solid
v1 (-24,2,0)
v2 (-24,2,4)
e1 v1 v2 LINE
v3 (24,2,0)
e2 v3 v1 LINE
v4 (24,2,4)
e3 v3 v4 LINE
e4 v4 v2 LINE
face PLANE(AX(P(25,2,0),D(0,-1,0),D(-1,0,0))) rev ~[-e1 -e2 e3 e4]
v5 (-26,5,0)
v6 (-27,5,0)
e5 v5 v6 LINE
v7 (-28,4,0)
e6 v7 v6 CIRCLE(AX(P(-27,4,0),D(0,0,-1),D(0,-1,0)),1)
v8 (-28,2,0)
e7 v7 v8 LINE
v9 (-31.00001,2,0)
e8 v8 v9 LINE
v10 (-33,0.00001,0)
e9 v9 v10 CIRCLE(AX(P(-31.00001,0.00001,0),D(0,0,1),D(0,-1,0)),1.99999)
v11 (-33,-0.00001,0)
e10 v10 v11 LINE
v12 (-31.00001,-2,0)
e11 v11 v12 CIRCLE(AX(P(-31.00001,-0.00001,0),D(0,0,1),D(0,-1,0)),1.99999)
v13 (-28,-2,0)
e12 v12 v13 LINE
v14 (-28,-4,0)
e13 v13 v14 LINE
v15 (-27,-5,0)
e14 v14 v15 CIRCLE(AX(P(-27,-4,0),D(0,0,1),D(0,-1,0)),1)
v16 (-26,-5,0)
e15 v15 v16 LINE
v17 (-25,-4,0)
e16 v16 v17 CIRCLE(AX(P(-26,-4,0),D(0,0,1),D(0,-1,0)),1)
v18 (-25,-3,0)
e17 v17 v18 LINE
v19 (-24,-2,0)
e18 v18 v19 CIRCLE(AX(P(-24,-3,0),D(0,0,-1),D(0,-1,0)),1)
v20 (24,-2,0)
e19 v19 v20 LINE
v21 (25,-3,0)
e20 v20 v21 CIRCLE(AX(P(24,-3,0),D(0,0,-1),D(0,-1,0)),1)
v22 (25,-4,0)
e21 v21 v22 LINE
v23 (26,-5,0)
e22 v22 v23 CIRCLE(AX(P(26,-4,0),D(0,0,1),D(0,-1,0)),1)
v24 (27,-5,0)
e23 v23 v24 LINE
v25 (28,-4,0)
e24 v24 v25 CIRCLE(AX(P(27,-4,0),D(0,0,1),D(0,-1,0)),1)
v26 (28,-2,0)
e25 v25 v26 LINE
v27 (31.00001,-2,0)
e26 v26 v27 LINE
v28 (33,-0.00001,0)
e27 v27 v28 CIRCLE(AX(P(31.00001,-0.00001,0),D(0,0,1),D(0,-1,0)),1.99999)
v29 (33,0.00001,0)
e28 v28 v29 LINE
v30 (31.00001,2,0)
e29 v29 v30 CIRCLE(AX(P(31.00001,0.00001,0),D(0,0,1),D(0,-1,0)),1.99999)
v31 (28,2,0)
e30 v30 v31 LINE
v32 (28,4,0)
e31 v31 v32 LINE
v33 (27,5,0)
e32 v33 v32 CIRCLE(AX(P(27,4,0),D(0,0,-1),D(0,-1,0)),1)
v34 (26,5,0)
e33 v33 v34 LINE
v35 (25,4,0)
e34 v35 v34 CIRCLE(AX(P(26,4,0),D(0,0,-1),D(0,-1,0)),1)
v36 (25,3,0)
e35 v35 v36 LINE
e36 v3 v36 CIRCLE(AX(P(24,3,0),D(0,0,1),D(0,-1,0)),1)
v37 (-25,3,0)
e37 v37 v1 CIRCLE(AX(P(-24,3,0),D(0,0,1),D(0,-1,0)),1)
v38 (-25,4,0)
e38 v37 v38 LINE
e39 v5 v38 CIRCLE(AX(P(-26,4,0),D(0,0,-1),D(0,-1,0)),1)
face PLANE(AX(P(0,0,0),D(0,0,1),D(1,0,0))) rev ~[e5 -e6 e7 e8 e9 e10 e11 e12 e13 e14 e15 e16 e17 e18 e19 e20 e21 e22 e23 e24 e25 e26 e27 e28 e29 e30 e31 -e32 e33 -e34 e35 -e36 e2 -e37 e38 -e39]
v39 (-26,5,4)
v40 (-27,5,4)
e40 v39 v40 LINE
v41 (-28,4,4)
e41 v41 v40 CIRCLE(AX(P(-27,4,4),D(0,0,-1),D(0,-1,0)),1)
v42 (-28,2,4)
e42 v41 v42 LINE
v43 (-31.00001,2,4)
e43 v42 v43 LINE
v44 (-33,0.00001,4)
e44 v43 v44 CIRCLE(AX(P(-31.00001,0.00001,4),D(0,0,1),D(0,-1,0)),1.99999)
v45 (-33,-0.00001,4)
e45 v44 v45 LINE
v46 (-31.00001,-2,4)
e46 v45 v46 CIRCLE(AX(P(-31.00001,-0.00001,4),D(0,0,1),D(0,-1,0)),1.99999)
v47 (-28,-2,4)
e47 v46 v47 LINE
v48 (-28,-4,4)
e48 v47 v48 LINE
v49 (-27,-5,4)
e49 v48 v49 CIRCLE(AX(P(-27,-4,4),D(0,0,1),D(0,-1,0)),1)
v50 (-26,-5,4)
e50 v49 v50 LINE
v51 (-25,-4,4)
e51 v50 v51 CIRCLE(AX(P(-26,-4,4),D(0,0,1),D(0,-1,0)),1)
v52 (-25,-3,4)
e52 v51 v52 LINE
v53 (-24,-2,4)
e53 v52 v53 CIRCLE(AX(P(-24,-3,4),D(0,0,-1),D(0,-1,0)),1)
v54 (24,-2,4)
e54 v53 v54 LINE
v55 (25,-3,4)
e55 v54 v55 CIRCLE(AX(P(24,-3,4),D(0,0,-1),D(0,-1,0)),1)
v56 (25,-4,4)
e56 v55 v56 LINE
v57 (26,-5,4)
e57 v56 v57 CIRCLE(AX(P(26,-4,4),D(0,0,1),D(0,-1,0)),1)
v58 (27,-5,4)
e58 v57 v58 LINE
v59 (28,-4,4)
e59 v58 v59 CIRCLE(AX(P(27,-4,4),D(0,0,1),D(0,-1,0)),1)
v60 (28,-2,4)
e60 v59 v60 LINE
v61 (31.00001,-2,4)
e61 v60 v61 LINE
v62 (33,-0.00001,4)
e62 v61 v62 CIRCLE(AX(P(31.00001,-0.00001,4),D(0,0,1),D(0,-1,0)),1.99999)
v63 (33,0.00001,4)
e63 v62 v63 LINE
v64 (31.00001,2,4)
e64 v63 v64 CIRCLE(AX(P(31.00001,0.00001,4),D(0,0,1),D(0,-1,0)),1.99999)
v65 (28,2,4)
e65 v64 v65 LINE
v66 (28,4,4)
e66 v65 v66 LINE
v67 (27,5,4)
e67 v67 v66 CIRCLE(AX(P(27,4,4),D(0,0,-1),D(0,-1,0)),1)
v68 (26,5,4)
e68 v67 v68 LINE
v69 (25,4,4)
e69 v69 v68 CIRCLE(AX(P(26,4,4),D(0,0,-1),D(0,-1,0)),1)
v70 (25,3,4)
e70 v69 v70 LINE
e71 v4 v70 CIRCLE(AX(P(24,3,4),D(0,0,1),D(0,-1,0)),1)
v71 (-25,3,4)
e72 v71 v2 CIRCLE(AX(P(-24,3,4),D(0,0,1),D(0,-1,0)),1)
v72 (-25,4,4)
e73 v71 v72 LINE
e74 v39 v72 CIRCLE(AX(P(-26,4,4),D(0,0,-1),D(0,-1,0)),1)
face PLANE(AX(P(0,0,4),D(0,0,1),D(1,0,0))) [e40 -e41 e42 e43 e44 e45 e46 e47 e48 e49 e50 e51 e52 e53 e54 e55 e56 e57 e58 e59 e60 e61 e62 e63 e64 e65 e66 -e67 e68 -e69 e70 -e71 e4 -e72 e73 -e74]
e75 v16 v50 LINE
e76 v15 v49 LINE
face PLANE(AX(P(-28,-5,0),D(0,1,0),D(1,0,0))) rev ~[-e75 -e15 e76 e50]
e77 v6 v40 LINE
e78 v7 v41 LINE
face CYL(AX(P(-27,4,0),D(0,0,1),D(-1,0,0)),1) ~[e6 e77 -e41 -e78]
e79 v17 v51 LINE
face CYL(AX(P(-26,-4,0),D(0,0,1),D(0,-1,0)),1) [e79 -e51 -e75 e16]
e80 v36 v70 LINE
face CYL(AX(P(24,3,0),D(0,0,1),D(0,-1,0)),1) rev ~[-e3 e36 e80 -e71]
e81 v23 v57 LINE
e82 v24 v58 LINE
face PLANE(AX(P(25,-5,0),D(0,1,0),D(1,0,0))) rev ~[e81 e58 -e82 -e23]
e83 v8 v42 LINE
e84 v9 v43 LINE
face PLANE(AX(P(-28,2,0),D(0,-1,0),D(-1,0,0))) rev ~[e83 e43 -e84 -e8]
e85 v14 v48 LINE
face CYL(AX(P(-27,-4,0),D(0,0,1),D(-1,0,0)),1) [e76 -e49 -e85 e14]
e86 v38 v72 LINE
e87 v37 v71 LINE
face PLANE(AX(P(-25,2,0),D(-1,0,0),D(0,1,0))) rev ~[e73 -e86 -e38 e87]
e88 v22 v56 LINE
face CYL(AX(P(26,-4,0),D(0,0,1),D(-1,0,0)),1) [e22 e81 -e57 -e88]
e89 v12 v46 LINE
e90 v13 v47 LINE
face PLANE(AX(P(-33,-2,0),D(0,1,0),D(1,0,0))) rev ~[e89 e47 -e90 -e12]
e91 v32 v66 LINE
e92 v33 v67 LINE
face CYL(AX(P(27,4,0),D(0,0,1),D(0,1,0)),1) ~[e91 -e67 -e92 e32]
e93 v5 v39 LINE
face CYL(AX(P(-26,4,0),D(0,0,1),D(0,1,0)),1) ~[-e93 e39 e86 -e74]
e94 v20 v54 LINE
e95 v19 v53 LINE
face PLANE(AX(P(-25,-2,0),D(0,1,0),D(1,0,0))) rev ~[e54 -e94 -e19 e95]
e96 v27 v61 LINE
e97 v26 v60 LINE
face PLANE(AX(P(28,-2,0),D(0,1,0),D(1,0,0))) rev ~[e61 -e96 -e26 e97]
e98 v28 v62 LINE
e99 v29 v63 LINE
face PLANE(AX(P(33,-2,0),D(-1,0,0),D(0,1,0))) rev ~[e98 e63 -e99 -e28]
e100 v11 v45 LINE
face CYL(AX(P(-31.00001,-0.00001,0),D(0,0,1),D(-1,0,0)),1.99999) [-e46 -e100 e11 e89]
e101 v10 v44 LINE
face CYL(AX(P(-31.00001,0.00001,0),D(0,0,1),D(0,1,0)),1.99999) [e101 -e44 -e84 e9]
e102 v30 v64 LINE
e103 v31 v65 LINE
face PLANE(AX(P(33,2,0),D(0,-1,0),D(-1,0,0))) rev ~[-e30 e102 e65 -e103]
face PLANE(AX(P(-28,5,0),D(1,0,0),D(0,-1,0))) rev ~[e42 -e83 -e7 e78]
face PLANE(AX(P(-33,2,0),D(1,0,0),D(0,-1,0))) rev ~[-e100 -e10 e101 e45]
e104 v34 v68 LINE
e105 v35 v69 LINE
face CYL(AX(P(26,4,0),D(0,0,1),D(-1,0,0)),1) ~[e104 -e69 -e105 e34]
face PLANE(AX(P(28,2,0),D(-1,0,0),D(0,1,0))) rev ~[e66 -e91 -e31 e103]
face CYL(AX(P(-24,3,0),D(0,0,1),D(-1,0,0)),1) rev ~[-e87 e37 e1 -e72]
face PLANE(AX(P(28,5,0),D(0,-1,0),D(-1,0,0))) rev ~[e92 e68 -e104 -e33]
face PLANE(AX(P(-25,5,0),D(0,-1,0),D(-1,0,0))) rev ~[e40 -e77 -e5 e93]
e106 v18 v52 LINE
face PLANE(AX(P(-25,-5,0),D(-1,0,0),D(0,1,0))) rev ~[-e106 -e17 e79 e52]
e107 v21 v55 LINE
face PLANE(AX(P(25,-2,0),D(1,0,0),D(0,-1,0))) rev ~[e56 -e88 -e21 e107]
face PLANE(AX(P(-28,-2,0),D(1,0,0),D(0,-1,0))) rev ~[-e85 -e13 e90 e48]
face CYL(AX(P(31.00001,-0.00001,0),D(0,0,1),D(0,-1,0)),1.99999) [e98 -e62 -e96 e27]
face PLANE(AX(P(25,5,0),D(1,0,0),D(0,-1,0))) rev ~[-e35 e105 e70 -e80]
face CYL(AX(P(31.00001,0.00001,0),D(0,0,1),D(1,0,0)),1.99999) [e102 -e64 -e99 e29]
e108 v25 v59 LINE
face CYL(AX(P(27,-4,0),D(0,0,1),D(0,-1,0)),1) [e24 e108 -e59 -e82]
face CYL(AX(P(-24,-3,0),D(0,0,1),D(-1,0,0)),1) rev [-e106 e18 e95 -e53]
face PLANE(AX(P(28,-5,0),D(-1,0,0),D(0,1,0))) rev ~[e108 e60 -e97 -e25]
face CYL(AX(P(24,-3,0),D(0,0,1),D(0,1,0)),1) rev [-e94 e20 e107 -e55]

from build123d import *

# Parameters (mm, degrees)
F1_DEPTH = 4
F2_R     = 1.99999
F3_R     = 1


# Not quite as in the source:
# - a fillet or chamfer is up to 0.001 mm smaller than in the source, because OpenCascade refuses the exact size


with BuildPart() as f1:
    # F0 (on Top) → F1 (new body)
    with BuildSketch(Plane.XY):
        Polygon((-28, 2), (-33, 2), (-33, -2), (-28, -2), (-28, -5), (-25, -5), (-25, -2), (25, -2), (25, -5), (28, -5), (28, -2), (33, -2), (33, 2), (28, 2), (28, 5), (25, 5), (25, 2), (-25, 2), (-25, 5), (-28, 5), align=None)
    extrude(amount=F1_DEPTH)

    # F2 (radius 2 in the source; OpenCascade refuses exactly that, so slightly less here)
    f2_edges = [f1.edges().sort_by_distance(p)[0] for p in [
        (33, -2, 2),
        (33, 2, 2),
        (-33, -2, 2),
        (-33, 2, 2),
    ]]
    fillet(f2_edges, radius=F2_R)

    # F3
    f3_edges = [f1.edges().sort_by_distance(p)[0] for p in [
        (-28, -5, 2),
        (-28, 5, 2),
        (28, -5, 2),
        (28, 5, 2),
        (-25, -5, 2),
        (-25, 5, 2),
        (25, 5, 2),
        (25, -5, 2),
        (25, -2, 2),
        (25, 2, 2),
        (-25, 2, 2),
        (-25, -2, 2),
    ]]
    fillet(f3_edges, radius=F3_R)


solid = f1.part
